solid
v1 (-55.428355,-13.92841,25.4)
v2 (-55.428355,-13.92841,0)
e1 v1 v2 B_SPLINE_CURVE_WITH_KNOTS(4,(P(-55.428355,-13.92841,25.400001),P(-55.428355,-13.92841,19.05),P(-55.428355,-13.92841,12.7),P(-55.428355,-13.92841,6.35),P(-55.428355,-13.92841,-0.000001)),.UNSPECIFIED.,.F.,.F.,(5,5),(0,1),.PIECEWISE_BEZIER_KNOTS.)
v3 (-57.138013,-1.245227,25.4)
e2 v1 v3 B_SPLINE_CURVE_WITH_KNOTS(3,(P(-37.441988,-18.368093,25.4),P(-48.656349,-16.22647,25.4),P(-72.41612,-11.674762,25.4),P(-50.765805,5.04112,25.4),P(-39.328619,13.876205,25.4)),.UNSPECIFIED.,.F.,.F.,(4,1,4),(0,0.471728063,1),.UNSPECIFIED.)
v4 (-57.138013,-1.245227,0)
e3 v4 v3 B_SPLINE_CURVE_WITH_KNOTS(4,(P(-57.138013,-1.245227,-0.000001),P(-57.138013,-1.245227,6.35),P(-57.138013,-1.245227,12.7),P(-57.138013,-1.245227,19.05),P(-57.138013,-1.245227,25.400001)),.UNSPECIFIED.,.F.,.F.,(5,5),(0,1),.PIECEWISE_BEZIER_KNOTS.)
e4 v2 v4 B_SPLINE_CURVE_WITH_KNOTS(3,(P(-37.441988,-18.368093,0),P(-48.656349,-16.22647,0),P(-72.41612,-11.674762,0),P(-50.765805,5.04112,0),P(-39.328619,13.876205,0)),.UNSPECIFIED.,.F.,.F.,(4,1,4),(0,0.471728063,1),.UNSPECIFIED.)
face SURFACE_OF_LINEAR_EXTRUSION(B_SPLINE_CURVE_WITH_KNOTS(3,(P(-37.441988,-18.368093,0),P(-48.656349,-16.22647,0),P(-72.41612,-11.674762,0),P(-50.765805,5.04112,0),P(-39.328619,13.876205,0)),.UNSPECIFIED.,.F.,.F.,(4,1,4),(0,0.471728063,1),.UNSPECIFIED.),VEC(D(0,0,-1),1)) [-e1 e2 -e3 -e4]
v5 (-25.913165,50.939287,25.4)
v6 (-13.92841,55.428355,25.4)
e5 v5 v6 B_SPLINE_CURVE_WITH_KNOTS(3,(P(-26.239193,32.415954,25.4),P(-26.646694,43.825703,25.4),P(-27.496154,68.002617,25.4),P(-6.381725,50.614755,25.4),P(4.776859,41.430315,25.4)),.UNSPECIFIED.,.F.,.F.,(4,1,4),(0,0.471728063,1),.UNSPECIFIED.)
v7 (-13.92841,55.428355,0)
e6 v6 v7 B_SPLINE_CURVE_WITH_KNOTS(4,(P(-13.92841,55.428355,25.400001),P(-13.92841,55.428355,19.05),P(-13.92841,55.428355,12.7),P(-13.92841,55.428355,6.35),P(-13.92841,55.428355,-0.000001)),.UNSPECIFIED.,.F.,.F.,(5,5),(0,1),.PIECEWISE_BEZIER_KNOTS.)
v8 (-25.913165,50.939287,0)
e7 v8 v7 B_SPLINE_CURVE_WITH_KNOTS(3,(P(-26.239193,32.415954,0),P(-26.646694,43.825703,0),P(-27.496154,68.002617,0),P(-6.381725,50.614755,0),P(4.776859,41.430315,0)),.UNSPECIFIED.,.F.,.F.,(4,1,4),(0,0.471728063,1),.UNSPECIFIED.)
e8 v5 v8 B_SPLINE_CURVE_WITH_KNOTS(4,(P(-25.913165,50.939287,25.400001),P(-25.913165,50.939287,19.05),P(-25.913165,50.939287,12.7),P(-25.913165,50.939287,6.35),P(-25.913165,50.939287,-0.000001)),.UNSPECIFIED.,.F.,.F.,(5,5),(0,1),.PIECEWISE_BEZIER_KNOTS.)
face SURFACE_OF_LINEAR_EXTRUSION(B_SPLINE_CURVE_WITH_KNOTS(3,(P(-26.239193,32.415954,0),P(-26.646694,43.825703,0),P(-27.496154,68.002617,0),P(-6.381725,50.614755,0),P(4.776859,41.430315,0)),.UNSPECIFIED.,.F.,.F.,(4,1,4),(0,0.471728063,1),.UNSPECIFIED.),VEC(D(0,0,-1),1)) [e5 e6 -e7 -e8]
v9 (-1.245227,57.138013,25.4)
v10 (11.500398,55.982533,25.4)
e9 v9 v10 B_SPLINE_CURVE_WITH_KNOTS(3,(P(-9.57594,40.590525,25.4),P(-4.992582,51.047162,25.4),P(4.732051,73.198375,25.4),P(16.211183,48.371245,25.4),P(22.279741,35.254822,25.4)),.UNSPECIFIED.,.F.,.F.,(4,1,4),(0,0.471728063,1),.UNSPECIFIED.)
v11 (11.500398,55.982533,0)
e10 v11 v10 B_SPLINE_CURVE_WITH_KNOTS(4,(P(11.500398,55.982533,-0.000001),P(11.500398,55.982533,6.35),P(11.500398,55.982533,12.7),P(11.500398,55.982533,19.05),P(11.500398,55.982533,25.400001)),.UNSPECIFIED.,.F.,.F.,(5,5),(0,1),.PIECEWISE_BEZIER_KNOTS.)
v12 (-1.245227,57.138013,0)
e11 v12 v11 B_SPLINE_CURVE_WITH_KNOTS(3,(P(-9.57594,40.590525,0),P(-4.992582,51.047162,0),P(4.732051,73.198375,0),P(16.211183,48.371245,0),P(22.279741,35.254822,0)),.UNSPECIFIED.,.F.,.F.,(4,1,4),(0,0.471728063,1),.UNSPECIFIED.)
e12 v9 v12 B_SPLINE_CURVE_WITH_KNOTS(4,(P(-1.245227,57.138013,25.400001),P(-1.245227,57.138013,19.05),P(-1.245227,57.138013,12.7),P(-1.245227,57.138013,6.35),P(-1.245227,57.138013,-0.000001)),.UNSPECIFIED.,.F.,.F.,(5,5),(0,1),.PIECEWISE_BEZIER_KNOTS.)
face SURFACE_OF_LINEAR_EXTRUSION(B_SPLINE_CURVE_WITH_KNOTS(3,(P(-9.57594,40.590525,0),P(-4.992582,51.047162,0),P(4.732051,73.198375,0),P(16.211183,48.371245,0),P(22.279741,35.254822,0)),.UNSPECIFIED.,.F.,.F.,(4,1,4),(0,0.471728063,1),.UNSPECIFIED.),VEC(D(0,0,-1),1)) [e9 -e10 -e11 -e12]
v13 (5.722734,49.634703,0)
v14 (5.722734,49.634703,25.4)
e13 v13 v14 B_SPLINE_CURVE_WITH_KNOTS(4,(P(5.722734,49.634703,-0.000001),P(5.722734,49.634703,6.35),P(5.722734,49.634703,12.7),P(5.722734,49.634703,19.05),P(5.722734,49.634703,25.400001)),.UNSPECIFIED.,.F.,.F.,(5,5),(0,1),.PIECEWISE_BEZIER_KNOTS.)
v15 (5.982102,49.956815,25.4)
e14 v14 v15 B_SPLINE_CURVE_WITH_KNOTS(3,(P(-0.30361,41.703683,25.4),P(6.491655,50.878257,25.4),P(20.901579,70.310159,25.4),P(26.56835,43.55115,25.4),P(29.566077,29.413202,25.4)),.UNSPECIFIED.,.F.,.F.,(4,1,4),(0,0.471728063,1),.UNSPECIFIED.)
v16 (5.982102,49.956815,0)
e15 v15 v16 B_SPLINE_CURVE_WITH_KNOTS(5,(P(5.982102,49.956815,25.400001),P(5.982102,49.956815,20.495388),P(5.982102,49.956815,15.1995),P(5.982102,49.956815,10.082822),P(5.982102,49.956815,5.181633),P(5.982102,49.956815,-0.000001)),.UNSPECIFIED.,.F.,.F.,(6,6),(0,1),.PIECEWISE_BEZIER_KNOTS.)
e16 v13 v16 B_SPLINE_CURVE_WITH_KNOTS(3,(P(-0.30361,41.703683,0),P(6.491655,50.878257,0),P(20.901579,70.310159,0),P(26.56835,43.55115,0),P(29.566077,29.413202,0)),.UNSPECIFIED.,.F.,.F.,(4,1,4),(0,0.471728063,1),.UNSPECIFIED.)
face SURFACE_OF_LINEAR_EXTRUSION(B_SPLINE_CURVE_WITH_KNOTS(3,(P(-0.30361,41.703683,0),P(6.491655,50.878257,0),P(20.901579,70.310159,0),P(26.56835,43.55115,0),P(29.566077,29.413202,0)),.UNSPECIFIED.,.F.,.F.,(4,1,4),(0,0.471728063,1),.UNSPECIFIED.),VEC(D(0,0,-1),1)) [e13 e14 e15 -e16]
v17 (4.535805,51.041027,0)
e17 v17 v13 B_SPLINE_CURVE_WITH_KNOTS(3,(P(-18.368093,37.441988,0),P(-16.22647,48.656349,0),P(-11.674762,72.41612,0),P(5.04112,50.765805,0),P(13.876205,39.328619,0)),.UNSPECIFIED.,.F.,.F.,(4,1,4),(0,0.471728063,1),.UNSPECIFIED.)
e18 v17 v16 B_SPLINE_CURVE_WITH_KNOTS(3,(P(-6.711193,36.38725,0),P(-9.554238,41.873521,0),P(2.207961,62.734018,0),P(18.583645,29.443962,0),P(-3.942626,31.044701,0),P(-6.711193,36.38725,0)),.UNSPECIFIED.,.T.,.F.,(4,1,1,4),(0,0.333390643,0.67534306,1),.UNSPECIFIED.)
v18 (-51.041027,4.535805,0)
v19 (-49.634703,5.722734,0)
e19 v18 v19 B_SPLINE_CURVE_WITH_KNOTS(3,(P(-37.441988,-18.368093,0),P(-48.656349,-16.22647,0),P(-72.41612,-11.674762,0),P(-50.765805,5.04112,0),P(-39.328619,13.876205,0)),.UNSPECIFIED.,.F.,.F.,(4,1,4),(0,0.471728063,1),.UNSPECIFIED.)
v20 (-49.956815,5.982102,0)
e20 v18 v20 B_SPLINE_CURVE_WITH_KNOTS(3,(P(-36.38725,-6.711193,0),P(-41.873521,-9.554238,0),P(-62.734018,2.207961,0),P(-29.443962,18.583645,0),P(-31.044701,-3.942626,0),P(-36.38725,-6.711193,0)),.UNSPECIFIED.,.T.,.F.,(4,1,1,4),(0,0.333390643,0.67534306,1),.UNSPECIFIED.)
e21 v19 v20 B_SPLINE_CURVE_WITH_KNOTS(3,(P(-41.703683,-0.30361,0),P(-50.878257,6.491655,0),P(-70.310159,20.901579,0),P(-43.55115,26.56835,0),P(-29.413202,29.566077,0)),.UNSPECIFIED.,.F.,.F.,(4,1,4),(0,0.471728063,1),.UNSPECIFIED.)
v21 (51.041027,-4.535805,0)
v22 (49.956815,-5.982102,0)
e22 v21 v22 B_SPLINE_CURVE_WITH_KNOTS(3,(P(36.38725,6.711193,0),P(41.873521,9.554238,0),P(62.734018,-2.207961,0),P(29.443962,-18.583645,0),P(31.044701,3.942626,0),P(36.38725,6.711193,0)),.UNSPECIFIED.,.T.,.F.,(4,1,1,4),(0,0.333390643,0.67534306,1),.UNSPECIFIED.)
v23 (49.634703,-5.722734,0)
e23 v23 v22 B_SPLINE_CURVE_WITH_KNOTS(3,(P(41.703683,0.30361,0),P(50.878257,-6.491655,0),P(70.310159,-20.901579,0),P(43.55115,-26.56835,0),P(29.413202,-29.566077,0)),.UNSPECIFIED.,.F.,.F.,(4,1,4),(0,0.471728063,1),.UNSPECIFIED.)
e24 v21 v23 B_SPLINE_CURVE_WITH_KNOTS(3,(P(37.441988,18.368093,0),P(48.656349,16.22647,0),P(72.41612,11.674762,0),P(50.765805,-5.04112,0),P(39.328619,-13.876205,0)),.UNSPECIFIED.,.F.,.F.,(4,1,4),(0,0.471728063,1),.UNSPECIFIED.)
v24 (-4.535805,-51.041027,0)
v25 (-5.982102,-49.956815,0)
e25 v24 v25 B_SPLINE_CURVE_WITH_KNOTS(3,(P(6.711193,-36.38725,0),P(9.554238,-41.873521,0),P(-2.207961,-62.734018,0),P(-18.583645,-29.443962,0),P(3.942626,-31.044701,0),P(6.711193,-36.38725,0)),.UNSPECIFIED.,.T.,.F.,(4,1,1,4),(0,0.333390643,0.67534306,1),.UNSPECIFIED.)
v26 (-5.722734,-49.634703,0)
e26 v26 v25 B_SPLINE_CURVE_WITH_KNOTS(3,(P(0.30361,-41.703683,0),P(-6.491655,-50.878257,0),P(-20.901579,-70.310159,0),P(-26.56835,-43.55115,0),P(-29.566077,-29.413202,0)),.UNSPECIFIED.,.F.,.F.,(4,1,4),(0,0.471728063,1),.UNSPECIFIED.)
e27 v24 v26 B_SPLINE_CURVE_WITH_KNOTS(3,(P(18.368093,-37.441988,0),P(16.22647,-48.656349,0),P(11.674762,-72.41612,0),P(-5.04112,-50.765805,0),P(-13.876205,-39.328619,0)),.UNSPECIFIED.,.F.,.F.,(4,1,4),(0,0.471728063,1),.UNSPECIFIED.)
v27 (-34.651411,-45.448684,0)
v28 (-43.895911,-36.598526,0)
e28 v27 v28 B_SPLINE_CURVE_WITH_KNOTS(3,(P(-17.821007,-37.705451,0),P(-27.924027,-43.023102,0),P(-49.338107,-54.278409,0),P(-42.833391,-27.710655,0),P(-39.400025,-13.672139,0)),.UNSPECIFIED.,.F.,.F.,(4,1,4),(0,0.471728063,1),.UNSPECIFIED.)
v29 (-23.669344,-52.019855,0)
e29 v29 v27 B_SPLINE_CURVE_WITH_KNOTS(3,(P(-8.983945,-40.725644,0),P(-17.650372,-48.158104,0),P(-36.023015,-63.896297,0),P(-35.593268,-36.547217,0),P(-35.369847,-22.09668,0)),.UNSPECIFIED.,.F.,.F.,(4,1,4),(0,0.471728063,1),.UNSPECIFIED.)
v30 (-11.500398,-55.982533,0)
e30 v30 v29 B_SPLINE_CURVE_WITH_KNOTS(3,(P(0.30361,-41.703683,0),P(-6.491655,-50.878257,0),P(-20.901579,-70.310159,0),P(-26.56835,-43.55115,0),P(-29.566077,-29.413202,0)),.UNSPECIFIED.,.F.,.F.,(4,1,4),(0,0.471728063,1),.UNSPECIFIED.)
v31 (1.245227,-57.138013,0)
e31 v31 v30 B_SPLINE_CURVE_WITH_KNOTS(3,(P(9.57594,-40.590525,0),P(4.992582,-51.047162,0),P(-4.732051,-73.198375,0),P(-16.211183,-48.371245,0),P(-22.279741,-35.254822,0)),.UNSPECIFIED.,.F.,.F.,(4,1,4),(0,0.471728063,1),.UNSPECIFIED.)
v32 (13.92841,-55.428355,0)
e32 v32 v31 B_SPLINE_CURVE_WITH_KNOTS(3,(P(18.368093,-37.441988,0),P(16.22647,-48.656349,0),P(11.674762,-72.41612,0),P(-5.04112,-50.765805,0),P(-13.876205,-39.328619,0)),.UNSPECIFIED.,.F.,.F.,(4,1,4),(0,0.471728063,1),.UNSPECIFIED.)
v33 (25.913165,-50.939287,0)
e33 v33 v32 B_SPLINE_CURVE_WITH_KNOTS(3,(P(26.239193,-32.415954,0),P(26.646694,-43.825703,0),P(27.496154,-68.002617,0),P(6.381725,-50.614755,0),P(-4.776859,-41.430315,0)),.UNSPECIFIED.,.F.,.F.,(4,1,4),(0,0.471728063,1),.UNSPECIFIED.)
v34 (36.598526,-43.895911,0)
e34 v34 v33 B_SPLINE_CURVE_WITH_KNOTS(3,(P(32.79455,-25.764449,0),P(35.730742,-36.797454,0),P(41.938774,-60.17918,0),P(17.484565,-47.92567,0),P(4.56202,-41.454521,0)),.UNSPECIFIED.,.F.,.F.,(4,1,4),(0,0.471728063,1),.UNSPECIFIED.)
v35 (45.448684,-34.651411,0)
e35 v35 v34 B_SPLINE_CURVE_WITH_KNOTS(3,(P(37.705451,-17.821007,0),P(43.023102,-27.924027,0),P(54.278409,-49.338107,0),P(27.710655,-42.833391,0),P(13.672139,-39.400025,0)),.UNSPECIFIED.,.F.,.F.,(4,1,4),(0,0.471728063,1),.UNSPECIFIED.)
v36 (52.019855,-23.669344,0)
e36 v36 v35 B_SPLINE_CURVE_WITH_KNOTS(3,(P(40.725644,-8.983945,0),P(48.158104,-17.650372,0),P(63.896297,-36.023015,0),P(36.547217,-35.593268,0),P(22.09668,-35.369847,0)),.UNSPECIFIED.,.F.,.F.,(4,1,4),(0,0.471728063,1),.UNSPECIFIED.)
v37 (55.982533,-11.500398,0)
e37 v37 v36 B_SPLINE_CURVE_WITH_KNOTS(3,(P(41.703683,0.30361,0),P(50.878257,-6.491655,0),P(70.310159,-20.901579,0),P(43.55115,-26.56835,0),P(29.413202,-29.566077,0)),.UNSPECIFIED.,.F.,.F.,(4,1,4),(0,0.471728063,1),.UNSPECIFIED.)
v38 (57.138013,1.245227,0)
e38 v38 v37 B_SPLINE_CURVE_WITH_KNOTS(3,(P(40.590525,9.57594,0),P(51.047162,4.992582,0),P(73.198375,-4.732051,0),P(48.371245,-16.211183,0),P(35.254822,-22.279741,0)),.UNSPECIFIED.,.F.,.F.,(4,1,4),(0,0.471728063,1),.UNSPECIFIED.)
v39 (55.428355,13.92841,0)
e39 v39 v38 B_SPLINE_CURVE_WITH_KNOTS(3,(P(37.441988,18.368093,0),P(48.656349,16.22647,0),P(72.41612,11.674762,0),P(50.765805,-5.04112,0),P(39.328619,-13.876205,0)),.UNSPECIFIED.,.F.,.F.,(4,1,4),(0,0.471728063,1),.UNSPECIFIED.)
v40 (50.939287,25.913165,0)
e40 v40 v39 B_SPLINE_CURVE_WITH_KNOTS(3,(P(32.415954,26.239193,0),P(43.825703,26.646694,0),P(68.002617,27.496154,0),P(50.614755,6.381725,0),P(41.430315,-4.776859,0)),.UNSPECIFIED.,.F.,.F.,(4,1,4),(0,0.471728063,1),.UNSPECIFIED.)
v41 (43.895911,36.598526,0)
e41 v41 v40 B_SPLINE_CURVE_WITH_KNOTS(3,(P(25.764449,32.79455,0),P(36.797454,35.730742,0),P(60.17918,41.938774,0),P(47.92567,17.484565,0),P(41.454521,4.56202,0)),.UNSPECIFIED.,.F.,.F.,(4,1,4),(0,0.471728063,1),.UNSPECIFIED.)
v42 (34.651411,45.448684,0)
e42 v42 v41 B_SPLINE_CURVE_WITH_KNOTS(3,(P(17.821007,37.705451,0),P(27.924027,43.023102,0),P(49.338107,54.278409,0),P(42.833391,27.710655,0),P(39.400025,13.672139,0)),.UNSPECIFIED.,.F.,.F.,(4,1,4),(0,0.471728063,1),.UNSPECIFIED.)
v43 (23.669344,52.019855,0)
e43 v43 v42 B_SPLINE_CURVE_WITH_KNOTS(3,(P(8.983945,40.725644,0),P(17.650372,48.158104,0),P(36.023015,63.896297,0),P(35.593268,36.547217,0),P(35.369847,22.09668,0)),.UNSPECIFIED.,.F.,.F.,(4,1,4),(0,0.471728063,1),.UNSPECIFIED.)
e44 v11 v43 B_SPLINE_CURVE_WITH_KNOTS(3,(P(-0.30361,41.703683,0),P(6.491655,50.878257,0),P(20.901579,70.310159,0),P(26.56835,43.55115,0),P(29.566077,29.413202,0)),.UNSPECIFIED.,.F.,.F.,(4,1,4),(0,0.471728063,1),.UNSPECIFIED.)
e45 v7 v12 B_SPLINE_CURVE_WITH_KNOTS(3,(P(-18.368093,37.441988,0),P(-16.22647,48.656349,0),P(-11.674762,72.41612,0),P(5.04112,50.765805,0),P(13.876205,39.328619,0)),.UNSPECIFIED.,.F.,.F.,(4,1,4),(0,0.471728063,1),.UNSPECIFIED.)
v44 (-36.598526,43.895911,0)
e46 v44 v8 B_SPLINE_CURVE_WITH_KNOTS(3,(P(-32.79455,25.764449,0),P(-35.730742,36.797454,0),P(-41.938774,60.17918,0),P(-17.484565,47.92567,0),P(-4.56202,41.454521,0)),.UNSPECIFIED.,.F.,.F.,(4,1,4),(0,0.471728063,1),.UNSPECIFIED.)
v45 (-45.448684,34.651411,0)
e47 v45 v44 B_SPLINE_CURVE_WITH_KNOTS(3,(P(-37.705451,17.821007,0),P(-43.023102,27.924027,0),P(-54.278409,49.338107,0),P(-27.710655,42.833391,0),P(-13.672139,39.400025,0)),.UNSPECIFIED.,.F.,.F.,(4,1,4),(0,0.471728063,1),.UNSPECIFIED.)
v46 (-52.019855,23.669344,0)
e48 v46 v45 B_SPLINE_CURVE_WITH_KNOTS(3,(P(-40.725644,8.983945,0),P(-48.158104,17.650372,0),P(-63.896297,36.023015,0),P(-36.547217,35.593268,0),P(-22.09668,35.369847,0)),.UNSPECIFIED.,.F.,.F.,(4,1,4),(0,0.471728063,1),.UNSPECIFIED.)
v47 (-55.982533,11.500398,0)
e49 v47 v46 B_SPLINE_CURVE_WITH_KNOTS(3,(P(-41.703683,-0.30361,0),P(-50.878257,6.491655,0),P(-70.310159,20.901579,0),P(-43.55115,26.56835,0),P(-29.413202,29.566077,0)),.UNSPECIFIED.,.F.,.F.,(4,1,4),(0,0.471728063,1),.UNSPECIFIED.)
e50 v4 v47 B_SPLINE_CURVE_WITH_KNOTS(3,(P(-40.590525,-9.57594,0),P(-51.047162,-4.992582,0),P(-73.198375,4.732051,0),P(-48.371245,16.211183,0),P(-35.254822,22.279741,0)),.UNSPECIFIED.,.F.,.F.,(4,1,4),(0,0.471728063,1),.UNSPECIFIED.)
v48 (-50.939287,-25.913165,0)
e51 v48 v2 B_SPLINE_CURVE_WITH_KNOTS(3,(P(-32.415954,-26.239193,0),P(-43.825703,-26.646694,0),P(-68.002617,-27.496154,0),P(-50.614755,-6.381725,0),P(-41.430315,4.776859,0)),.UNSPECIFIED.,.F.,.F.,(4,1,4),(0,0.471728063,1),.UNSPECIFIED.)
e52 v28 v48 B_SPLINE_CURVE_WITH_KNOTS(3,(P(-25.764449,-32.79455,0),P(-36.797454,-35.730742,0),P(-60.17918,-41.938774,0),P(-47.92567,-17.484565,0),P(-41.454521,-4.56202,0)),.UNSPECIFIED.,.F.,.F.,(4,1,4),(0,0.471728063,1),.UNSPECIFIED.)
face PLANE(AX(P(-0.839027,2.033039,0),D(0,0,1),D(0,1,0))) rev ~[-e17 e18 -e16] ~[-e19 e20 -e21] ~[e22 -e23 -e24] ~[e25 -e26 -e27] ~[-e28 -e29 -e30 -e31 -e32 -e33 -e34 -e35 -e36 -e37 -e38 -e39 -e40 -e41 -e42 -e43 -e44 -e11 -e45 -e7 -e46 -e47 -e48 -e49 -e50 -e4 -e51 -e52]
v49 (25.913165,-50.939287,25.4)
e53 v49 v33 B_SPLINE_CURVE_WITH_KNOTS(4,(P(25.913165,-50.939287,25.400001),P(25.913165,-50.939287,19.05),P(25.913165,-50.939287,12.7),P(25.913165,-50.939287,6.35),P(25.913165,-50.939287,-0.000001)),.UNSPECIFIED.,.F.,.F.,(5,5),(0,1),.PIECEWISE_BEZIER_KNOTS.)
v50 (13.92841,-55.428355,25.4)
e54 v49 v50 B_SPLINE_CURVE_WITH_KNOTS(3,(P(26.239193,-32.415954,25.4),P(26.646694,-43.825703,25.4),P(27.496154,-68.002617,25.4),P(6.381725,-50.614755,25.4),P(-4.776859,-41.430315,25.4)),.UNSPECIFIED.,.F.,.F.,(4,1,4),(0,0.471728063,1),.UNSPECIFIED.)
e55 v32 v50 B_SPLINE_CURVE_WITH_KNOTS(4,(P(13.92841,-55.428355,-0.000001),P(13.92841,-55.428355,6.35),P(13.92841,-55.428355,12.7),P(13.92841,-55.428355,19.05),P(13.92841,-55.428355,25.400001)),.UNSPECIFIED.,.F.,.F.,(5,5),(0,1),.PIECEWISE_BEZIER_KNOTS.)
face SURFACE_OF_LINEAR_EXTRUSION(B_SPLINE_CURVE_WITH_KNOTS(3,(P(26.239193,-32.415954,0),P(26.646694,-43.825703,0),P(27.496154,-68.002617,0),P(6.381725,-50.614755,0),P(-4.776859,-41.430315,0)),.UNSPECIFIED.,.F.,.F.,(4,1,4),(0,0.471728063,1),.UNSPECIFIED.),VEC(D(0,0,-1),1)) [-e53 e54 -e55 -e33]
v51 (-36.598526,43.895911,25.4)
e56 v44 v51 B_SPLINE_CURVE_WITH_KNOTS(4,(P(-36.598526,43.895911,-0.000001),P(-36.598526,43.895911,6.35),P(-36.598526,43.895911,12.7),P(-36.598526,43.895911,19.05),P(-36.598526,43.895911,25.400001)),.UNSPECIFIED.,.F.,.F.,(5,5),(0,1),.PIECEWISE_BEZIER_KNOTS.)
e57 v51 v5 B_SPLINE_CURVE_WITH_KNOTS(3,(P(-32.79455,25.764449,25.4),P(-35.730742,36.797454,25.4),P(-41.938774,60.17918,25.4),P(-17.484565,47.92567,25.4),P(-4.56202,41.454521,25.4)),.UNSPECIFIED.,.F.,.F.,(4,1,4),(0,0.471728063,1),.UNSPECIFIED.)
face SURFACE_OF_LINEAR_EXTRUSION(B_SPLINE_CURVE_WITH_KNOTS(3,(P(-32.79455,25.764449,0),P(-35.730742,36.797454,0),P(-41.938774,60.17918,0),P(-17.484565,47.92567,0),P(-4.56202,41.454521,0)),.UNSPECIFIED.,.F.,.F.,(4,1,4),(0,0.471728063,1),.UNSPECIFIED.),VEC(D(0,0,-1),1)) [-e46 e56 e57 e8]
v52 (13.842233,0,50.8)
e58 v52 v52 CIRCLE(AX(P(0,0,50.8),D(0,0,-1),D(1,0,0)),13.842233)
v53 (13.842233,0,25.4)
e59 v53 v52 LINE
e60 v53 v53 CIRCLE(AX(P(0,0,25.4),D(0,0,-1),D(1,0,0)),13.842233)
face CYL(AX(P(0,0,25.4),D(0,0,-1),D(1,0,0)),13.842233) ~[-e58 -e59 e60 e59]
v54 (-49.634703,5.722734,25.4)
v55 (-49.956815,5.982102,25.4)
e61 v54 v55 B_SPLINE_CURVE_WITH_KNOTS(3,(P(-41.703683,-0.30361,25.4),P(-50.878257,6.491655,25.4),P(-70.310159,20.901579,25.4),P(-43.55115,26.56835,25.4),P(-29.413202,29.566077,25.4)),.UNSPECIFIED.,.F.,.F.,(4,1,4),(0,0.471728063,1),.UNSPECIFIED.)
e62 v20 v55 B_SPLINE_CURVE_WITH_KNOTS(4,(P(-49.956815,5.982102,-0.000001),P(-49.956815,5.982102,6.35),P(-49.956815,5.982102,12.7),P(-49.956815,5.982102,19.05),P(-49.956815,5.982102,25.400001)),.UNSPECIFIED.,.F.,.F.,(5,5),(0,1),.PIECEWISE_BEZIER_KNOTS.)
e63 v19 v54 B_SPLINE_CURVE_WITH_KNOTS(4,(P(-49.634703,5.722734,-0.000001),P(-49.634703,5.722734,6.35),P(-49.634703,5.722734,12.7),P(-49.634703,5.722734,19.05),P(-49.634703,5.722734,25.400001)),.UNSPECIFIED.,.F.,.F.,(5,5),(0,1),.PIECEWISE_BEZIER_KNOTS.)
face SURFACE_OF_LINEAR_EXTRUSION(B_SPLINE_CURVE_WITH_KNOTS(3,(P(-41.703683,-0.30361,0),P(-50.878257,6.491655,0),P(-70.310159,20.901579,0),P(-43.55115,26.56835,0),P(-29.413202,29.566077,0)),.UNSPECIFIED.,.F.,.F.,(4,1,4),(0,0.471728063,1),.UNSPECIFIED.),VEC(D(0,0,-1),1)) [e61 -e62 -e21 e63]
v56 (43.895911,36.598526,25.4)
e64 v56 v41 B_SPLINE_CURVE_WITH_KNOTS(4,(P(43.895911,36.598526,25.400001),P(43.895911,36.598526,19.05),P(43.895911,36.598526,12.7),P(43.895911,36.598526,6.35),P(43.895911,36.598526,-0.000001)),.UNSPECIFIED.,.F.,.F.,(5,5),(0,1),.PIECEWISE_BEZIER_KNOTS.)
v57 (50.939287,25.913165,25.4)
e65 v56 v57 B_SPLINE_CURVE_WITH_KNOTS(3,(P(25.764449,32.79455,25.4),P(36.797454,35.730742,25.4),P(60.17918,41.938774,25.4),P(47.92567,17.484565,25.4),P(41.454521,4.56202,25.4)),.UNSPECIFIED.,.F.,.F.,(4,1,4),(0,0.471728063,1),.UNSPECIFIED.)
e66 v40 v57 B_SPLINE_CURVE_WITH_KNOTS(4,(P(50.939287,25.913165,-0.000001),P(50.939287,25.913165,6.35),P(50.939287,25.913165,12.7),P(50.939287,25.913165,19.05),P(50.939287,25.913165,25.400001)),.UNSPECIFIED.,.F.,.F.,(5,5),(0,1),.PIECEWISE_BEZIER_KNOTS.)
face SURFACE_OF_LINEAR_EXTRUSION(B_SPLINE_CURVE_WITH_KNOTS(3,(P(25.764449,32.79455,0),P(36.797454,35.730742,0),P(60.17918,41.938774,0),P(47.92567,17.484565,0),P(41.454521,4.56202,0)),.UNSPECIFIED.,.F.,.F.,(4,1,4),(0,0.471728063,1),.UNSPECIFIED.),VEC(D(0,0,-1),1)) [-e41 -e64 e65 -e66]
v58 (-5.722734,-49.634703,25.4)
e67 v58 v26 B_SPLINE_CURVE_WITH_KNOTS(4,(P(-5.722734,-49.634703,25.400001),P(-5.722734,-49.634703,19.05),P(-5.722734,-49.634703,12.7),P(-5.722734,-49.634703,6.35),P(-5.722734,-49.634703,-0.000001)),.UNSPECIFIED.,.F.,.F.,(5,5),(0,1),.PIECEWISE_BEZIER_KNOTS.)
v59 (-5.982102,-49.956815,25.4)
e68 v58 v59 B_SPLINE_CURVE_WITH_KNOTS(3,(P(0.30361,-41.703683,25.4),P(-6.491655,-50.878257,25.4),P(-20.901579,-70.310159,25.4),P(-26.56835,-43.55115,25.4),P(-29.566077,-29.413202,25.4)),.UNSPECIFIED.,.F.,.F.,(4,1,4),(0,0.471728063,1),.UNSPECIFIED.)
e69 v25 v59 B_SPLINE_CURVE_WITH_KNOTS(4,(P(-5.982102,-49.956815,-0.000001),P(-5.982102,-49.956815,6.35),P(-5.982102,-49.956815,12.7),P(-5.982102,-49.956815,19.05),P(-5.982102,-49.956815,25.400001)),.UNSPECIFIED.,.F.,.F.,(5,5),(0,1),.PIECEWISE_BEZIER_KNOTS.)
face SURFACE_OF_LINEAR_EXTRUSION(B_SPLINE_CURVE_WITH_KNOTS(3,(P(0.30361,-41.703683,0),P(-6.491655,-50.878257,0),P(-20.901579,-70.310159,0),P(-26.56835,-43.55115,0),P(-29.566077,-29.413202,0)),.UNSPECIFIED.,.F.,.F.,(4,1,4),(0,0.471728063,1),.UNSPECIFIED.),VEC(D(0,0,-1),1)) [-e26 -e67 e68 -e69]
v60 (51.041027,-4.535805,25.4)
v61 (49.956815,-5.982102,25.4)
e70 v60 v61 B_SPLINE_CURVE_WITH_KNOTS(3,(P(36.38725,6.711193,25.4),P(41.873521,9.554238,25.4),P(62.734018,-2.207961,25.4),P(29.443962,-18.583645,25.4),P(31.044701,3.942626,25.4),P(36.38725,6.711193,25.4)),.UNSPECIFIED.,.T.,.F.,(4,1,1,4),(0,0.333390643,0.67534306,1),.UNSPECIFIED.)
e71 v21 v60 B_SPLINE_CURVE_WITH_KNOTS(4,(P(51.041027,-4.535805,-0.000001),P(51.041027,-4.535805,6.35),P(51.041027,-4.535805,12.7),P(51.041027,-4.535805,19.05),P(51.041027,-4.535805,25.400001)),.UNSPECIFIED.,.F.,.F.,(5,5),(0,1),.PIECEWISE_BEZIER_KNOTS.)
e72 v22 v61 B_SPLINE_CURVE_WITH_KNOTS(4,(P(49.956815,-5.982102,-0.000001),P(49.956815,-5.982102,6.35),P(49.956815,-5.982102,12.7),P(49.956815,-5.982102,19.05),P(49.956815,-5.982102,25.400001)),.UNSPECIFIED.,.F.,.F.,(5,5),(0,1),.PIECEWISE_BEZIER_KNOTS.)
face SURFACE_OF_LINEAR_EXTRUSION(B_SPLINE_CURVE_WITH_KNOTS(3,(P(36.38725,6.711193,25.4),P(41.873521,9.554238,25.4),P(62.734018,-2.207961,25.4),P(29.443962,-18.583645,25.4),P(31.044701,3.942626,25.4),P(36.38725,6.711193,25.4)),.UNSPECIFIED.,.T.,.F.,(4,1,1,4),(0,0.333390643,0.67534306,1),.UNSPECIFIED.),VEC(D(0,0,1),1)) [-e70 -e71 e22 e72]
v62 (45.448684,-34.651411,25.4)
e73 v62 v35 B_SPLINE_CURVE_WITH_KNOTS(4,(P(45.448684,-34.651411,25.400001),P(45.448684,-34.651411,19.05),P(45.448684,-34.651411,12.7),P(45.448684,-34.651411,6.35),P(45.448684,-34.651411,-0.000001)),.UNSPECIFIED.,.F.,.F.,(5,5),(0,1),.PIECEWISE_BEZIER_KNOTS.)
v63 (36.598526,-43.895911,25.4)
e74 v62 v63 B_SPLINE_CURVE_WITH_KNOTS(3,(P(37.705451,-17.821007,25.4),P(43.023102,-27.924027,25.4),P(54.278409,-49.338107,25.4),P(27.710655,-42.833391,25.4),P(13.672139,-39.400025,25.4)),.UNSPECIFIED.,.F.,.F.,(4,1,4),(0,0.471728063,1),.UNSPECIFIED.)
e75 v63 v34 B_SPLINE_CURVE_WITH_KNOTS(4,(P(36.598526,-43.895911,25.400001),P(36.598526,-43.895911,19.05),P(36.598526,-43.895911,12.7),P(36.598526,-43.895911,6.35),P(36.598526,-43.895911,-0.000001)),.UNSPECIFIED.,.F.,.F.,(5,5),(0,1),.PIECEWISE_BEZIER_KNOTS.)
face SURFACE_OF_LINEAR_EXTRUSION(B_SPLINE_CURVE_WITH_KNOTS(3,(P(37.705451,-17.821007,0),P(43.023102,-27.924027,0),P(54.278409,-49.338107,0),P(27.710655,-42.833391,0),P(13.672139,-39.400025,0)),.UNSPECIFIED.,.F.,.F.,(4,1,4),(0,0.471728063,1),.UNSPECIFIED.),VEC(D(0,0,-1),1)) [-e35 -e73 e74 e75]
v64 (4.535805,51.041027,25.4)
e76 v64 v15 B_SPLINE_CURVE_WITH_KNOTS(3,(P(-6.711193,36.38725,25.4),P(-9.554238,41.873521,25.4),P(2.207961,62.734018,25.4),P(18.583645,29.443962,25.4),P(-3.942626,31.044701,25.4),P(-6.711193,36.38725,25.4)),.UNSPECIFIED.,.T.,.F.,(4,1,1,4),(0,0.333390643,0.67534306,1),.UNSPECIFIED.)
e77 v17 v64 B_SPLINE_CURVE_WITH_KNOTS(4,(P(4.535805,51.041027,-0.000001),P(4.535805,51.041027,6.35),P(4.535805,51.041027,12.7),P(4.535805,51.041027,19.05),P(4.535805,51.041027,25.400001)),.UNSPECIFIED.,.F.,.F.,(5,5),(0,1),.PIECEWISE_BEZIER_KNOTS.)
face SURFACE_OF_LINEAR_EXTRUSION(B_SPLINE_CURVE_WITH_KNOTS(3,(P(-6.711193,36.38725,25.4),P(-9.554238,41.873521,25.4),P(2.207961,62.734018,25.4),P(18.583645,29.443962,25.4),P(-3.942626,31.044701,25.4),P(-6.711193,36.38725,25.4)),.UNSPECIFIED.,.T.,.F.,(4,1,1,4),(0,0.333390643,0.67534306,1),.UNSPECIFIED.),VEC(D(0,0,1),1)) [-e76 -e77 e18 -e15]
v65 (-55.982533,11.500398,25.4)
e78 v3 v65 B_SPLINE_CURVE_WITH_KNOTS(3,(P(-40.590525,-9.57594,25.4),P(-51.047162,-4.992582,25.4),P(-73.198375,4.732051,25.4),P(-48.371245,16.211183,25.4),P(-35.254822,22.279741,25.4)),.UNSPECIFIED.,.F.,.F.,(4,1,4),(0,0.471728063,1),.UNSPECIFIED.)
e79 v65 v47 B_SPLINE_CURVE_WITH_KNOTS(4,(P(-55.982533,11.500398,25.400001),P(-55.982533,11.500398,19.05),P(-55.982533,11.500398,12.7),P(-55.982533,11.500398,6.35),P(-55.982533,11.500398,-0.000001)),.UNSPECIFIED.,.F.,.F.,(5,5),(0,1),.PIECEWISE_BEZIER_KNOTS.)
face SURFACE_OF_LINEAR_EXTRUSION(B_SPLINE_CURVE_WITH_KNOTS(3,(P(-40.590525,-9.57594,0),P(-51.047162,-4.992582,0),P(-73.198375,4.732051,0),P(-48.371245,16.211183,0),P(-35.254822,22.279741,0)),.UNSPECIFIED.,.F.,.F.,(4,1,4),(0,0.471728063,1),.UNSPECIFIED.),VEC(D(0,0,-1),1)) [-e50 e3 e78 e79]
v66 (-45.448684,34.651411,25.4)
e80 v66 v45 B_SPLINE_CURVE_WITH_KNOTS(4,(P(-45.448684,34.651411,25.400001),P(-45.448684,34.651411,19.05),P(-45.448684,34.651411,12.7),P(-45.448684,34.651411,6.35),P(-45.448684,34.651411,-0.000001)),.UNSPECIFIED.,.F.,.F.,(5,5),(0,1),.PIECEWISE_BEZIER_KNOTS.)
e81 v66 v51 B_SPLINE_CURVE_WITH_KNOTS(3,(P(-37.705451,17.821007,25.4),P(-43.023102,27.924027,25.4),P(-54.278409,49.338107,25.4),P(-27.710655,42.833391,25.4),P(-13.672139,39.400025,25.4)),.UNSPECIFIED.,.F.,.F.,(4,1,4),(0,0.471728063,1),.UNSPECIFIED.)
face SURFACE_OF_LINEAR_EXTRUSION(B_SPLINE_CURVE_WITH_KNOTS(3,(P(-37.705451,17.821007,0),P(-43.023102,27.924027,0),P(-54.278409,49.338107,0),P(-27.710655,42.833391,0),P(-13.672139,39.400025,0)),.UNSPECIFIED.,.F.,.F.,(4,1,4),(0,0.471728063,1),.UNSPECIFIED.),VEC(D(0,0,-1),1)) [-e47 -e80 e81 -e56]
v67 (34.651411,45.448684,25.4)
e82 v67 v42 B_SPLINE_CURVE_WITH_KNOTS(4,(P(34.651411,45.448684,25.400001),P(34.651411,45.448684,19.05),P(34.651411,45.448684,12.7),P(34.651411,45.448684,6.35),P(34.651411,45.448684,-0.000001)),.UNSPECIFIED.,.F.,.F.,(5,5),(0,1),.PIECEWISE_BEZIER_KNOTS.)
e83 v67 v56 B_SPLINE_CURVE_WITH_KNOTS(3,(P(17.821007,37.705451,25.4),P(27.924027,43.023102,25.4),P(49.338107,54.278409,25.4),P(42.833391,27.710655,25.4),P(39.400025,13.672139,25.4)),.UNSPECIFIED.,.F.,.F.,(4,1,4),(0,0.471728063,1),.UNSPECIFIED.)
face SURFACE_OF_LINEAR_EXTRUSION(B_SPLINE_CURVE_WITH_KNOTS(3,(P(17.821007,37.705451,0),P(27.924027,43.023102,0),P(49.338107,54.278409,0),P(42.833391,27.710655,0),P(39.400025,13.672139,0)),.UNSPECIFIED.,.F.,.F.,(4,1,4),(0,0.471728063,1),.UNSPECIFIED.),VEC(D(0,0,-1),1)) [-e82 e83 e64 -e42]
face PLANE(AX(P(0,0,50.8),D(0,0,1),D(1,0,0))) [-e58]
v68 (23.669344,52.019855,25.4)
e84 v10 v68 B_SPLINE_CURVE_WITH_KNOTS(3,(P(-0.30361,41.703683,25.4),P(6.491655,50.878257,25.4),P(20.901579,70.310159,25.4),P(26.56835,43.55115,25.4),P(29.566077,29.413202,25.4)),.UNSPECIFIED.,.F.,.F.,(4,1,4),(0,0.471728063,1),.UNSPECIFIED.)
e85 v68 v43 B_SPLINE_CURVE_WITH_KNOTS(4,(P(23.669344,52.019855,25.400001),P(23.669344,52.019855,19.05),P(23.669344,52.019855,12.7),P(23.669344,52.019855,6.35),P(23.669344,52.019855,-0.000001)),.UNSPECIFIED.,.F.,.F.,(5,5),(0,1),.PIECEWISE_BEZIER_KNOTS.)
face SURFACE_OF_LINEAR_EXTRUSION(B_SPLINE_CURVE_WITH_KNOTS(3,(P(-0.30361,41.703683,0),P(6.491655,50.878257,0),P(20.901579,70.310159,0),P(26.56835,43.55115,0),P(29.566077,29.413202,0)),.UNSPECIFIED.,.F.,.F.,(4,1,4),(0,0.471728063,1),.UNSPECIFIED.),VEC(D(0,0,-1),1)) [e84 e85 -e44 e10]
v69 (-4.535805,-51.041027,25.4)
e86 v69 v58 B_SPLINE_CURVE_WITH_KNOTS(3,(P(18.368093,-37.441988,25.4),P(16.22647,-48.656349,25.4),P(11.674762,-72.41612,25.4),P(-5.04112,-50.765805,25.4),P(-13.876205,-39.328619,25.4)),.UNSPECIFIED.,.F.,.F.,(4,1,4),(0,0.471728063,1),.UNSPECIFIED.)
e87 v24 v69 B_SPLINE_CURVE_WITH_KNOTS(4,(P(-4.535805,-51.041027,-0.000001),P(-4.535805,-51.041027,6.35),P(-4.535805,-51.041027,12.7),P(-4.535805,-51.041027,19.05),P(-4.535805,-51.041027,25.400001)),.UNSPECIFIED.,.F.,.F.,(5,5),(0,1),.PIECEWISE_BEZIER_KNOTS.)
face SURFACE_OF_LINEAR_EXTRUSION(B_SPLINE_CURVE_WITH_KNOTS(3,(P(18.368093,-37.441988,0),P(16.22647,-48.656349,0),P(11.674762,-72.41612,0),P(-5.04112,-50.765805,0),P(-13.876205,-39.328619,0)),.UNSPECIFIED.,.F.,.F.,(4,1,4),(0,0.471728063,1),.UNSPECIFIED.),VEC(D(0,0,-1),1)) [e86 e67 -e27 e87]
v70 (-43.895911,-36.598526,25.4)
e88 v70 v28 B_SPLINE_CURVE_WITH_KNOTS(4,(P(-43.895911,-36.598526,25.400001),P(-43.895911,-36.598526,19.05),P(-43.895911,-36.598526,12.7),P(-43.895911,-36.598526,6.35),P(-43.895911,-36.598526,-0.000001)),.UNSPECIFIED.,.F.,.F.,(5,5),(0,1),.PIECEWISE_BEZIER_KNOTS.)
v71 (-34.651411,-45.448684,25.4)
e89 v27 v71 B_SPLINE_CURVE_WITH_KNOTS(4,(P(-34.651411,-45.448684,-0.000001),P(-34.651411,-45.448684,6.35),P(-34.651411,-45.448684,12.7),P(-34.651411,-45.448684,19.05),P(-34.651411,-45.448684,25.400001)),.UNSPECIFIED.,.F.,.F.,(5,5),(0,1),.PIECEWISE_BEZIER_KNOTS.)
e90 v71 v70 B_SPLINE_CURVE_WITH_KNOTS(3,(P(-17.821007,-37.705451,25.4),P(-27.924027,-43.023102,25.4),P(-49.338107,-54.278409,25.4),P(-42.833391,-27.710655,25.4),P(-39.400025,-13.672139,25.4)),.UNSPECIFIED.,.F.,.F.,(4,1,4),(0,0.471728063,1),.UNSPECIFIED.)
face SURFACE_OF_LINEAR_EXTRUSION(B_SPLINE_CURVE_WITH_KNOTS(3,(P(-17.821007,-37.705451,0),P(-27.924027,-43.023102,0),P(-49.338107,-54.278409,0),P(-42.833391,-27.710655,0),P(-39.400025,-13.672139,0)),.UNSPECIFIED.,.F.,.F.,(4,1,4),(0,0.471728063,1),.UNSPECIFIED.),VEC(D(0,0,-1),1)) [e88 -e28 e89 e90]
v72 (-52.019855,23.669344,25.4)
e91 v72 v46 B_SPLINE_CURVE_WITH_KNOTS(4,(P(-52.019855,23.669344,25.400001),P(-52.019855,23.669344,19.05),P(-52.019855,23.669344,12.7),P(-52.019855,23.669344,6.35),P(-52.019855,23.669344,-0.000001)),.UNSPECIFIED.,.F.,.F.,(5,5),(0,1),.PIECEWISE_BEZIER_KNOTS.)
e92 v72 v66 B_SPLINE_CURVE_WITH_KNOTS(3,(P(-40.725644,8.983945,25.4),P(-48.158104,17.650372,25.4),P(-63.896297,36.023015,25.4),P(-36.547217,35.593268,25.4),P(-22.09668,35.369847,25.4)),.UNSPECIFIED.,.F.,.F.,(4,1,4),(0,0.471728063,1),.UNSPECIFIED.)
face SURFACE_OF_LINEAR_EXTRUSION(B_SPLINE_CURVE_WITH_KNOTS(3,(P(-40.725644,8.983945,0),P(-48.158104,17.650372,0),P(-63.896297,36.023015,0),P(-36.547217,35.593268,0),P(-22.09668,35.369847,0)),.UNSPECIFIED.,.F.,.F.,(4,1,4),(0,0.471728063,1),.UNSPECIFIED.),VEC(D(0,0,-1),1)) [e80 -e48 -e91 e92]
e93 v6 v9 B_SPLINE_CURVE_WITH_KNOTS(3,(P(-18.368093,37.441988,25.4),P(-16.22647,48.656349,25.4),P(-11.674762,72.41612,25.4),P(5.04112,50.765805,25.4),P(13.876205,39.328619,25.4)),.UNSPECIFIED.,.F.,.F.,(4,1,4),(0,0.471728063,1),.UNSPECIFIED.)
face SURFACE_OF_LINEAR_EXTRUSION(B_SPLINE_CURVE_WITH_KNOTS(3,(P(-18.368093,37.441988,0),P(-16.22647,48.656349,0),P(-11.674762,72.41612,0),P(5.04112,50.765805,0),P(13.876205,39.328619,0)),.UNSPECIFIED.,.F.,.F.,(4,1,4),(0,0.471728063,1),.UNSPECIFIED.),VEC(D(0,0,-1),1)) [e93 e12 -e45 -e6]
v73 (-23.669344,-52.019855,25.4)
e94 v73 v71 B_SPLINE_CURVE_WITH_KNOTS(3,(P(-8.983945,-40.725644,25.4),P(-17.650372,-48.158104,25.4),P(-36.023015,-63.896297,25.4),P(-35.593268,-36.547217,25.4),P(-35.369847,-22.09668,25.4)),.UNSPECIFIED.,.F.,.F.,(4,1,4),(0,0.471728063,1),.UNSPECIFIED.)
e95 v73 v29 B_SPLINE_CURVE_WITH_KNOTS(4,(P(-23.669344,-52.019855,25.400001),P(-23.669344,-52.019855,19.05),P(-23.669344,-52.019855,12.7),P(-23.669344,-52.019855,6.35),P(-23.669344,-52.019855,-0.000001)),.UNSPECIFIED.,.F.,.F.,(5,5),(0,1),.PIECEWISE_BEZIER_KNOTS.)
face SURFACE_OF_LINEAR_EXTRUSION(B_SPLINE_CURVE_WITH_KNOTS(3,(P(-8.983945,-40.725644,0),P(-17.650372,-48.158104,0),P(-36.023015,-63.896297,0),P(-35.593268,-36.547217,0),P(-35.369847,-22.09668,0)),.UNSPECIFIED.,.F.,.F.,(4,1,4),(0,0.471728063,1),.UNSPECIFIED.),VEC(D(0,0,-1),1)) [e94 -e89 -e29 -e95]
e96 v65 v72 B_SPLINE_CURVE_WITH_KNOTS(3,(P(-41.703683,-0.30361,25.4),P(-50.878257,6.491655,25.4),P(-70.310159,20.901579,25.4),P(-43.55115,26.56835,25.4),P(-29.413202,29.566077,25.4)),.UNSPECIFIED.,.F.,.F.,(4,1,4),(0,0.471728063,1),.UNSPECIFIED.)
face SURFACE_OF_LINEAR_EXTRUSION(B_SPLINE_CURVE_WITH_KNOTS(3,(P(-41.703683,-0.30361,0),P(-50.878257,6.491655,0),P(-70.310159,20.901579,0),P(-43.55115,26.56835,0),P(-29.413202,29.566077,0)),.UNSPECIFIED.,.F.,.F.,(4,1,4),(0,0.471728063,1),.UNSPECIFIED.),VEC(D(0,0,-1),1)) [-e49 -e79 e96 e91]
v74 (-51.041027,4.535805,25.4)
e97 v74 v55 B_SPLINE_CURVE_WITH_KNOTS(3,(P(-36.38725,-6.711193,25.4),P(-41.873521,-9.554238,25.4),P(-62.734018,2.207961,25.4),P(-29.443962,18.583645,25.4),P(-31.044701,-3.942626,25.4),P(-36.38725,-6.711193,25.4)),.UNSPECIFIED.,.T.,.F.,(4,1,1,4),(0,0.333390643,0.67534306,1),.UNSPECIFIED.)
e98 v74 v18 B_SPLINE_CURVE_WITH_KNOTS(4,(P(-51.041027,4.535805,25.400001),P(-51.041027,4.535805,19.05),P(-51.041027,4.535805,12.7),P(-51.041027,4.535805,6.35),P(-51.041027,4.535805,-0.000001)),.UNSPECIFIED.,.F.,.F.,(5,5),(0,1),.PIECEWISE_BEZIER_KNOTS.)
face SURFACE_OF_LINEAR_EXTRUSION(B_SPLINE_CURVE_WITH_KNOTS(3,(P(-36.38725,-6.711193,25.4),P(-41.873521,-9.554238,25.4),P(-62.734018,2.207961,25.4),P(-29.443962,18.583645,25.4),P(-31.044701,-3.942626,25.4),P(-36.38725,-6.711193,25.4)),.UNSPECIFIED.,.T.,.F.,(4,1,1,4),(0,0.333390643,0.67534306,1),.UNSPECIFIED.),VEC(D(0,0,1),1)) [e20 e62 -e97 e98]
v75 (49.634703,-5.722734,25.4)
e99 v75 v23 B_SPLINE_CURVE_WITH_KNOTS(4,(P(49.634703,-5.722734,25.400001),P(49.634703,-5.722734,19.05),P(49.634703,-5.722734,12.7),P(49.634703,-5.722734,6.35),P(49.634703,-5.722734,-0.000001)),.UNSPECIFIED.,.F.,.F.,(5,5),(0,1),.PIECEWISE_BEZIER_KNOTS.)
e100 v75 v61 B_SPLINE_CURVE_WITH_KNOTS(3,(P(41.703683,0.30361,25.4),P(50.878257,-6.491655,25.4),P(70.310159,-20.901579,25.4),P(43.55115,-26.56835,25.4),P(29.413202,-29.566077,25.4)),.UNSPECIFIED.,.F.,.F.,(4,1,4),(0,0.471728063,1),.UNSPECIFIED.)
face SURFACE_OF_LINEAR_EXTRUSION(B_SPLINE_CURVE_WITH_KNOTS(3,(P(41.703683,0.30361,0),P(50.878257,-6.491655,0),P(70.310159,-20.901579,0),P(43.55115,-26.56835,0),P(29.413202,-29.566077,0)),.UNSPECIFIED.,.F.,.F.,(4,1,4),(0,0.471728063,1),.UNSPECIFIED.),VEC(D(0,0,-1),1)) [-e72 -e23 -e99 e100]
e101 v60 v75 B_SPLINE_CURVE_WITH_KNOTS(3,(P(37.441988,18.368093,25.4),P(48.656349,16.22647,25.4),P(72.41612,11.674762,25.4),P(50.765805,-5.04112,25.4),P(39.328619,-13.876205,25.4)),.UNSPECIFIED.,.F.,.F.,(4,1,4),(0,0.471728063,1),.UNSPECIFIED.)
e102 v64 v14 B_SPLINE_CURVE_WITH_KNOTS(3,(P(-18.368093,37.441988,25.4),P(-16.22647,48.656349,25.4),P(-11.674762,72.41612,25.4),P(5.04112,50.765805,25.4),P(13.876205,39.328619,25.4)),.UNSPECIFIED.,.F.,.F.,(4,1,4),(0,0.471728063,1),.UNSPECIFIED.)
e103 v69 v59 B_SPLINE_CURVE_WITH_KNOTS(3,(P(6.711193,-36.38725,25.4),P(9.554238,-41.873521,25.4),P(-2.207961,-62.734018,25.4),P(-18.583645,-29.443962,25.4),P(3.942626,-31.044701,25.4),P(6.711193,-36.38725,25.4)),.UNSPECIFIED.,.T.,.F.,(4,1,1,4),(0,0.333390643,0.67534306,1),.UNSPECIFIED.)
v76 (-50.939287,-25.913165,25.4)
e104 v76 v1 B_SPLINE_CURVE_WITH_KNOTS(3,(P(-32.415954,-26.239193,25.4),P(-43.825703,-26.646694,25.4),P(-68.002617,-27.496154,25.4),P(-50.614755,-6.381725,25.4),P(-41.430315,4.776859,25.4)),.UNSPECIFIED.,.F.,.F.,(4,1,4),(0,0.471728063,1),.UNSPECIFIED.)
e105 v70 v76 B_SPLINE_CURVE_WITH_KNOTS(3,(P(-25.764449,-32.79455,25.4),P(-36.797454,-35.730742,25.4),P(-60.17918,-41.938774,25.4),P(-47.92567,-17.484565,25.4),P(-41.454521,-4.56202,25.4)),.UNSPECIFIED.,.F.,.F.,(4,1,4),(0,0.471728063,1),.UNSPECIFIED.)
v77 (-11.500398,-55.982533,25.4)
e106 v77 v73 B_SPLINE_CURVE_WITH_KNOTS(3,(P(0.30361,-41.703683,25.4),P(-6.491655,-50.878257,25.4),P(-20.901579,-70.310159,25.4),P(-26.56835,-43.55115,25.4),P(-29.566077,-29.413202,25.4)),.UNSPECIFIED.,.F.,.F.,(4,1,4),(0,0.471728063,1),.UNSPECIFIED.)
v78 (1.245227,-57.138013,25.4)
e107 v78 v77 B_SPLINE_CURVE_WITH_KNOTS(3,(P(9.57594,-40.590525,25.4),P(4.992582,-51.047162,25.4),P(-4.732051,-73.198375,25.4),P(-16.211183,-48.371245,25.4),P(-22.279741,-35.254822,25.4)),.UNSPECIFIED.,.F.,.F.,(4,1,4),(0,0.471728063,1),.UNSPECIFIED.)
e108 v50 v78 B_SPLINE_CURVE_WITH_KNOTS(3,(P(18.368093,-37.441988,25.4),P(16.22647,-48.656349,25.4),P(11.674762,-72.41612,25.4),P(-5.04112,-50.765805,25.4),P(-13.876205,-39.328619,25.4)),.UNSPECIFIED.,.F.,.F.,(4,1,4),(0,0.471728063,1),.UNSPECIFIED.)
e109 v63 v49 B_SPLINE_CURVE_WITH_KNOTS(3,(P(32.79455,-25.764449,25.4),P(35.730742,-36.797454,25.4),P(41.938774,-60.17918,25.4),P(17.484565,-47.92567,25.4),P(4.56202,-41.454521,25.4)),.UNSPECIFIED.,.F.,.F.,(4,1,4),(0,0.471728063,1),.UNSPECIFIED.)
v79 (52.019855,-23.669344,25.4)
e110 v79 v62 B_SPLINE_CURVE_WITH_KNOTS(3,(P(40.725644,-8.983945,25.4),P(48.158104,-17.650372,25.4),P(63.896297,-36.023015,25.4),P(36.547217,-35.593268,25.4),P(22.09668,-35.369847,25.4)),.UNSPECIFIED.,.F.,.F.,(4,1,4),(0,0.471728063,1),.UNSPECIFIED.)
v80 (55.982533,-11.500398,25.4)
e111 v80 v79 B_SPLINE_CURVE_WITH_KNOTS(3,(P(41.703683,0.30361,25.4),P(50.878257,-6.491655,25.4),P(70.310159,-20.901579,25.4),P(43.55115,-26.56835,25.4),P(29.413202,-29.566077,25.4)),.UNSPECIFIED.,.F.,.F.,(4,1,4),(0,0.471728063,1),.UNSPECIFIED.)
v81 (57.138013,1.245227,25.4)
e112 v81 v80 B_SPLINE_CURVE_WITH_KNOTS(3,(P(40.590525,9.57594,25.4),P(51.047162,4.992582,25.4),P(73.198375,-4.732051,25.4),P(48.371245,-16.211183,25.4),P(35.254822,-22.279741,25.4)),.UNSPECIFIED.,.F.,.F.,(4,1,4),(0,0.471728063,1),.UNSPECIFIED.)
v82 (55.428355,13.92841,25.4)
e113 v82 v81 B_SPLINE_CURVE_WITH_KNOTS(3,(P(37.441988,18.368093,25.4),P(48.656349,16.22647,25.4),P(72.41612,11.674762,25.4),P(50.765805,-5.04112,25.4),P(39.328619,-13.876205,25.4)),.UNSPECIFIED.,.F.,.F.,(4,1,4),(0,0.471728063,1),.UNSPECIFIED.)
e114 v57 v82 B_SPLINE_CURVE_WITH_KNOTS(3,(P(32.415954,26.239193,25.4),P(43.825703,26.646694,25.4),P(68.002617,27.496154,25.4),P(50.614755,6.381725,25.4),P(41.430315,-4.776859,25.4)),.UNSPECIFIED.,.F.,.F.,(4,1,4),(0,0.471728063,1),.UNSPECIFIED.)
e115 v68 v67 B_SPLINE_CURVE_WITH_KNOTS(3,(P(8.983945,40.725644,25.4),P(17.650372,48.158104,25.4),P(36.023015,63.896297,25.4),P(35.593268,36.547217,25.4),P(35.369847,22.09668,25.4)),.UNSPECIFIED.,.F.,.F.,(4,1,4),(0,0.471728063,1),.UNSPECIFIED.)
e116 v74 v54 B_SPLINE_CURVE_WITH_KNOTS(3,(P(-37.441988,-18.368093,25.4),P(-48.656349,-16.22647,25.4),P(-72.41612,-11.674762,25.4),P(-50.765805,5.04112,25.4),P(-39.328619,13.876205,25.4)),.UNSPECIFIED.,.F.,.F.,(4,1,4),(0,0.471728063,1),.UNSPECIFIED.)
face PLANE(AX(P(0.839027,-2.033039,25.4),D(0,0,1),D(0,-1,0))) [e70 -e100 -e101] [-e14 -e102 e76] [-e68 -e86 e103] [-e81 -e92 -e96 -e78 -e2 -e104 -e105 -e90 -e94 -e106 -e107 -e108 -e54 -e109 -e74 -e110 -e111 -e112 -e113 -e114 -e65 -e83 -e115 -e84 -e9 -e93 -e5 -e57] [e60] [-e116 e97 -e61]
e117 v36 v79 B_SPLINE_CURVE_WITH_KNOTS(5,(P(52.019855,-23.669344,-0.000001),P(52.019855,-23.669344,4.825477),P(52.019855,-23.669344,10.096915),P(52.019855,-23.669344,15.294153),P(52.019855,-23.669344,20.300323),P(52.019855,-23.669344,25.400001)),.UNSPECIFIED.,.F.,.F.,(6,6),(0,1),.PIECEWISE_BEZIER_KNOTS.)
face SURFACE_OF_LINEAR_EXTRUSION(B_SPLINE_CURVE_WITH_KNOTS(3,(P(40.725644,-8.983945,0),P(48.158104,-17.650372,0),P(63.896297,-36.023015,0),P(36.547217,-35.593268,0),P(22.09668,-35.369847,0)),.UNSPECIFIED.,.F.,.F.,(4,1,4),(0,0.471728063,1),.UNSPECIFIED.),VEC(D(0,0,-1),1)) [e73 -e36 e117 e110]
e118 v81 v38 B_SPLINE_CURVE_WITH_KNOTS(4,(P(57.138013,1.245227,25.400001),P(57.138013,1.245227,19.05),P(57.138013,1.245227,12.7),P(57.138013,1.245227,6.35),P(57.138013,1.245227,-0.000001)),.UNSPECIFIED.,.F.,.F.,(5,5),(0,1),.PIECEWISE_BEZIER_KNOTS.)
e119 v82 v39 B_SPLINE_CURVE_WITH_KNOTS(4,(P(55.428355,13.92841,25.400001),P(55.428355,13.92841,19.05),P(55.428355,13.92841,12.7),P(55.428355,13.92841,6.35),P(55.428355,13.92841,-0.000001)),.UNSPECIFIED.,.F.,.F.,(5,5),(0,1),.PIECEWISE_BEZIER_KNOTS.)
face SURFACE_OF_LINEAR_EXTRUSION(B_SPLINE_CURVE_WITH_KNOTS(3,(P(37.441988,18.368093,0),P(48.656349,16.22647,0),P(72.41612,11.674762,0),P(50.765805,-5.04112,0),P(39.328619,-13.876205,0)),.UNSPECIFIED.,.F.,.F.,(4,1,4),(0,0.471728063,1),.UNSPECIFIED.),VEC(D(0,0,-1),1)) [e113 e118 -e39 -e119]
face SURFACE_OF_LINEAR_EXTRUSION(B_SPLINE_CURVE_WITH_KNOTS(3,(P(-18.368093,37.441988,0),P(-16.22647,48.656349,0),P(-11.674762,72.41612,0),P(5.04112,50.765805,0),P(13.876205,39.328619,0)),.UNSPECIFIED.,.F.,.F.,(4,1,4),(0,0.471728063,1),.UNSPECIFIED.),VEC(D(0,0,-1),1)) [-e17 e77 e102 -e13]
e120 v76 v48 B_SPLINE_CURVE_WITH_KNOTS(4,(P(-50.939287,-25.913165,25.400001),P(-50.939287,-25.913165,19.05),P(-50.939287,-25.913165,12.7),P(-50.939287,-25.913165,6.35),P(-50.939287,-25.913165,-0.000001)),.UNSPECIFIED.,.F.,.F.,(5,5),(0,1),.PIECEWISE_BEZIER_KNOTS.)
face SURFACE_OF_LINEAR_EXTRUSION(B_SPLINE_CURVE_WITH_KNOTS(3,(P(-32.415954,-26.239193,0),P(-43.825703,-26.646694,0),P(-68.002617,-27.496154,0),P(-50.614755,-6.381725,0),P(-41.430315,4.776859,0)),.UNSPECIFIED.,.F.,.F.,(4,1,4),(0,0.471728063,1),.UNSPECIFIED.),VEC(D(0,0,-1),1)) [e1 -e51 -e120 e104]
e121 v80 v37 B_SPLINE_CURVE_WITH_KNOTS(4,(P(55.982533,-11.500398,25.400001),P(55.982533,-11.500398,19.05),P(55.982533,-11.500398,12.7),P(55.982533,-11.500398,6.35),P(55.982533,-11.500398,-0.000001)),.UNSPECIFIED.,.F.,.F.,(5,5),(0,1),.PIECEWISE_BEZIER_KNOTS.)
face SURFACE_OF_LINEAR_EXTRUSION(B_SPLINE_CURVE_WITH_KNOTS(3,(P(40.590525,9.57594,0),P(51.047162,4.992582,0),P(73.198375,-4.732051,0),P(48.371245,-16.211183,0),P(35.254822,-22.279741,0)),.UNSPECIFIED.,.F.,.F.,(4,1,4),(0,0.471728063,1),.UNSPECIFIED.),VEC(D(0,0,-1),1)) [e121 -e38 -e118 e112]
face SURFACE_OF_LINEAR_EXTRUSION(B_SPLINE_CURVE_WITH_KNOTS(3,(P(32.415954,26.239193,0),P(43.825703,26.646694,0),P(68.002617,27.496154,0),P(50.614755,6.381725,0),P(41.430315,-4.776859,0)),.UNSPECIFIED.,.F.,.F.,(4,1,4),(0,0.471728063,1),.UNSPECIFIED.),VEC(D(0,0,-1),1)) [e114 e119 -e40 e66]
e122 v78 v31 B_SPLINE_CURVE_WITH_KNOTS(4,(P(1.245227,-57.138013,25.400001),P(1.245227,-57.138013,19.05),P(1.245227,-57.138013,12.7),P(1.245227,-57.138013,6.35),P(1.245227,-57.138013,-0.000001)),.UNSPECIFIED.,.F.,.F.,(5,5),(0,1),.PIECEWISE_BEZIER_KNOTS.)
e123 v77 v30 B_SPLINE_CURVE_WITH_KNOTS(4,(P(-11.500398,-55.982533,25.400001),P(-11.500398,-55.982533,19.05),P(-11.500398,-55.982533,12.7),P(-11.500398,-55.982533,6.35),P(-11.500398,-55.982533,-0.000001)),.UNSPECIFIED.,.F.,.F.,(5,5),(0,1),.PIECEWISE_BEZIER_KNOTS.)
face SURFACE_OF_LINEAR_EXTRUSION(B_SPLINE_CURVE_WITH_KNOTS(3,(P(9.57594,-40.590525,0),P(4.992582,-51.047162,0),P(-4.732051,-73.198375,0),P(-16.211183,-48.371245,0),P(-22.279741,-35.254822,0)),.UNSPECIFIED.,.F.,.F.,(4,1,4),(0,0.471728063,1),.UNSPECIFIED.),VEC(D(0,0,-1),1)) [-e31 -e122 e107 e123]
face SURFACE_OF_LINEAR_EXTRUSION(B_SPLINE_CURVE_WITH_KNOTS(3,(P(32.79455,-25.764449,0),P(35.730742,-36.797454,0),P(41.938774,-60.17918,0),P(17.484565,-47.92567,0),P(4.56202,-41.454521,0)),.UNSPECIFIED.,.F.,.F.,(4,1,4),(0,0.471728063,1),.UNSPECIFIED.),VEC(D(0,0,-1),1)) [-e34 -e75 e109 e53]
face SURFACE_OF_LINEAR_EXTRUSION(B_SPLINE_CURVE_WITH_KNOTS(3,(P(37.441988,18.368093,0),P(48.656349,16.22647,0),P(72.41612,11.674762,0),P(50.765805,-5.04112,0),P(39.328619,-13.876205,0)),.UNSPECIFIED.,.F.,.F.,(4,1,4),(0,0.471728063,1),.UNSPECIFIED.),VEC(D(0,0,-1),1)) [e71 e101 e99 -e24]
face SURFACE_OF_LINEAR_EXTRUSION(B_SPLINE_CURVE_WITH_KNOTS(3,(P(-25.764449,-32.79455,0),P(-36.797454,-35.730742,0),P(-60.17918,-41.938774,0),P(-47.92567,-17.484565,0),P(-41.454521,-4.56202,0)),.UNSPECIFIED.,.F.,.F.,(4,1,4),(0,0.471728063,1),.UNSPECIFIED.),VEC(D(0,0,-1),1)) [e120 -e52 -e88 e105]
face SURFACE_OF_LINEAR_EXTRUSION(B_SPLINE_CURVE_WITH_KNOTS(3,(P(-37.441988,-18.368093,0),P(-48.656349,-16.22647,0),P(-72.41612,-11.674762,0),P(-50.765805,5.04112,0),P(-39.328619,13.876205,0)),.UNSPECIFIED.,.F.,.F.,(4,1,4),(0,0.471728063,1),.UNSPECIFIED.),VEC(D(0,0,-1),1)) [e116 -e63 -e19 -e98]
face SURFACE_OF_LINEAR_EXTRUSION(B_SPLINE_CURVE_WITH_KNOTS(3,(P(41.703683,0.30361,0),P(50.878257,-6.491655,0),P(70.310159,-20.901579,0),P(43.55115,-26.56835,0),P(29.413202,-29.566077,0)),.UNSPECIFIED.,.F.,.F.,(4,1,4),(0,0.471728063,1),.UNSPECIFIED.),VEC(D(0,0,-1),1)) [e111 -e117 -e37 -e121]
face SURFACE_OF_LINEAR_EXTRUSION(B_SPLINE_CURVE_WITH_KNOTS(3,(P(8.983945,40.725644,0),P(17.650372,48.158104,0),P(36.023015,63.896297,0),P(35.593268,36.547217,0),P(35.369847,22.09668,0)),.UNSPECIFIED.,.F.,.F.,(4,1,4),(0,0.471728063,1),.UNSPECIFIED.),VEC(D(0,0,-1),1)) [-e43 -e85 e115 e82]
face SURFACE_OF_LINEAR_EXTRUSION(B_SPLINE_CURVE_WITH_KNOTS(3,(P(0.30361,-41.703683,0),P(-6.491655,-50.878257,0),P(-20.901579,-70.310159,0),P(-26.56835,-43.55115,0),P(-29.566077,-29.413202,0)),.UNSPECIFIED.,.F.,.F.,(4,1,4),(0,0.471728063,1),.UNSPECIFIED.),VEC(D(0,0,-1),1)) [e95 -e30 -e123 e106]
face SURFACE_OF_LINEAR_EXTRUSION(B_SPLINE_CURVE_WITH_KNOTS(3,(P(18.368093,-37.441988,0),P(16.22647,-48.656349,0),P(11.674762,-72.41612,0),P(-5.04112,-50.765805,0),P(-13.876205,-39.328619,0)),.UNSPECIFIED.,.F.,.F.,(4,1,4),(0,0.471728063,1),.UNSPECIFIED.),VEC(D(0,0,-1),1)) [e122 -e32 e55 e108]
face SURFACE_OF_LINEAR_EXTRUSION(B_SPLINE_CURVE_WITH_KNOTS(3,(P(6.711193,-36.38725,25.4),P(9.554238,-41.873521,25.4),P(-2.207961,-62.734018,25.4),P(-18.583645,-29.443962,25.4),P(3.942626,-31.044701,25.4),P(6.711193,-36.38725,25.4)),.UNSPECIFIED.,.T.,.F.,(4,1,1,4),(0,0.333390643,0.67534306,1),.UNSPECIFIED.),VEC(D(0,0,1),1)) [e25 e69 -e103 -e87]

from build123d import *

# Parameters (mm, degrees)
F1_DEPTH = 25.4
F2_COUNT = 7
F3_R     = 5.08
F5_DEPTH = 25.4
F6_R     = 13.8422329742
F7_DEPTH = 25.4
F8_COUNT = 4


with BuildPart() as f1:
    # F0 (on Top) → F1 (new body)
    with BuildSketch(Plane.XY):
        with BuildLine():
            ThreePointArc((-0.3036099023, 41.7036828128), (-29.3821999901, -29.5968860332), (41.704787964, 0))
            ThreePointArc((41.704787964, 0), (38.5508515564, 15.909782632), (29.5660770028, 29.4132016242))
            ThreePointArc((29.5660770028, 29.4132016242), (15.869372299, 38.5675039633), (-0.3036099023, 41.7036828128))
        make_face()
        with BuildLine():
            ThreePointArc((-0.3036099023, 41.7036828128), (15.869372299, 38.5675039633), (29.5660770028, 29.4132016242))
            add(Edge.make_bspline(
                [(-0.3036099023, 41.7036828128), (6.4916545945, 50.8782567936), (20.9015792408, 70.3101588182), (26.5683495721, 43.5511495821), (29.5660770028, 29.4132016242)],
                knots=[0, 0, 0, 0, 0.4717280628, 1, 1, 1, 1], degree=3))
        make_face()
    extrude(amount=F1_DEPTH)

    # F2: F1 ×7 about axis
    f2_axis = Axis((0, 0, 25.4), (0, 0, -1))


with BuildPart() as f1_1:
    add(f1.part)
    for i in range(1, F2_COUNT):
        add(f1.part.rotate(f2_axis, i * 360 / F2_COUNT))

    # F3
    f3_edges = [f1_1.edges().sort_by_distance(p)[0] for p in [
        (-0.30361, 41.703683, 12.7),
    ]]
    fillet(f3_edges, radius=F3_R)

    # F4 (on face) → F5 (cut)
    with BuildSketch(Plane.XY.offset(25.4)):
        with BuildLine():
            add(Edge.make_bspline(
                [(-36.3872498274, -6.7111928947), (-41.8735206701, -9.5542377544), (-62.7340181989, 2.2079607061), (-29.4439624143, 18.5836450682), (-31.0447006553, -3.9426261585), (-36.3872498274, -6.7111928947)],
                knots=[0, 0, 0, 0, 0.3333906433, 0.6753430597, 1, 1, 1, 1], degree=3))
        make_face()
    extrude(amount=-F5_DEPTH, mode=Mode.SUBTRACT)

    # F6 (on face) → F7 (join)
    with BuildSketch(Plane.XY.offset(25.4)):
        Circle(F6_R)
    extrude(amount=F7_DEPTH)

    # F8: F1 ×4 about axis
    f8_axis = Axis((0, 0, 50.8), (0, 0, 1))


with BuildPart() as f1_2:
    add(f1_1.part)
    for i in range(1, F8_COUNT):
        add(f1_1.part.rotate(f8_axis, i * 360 / F8_COUNT))


solid = f1_2.part
